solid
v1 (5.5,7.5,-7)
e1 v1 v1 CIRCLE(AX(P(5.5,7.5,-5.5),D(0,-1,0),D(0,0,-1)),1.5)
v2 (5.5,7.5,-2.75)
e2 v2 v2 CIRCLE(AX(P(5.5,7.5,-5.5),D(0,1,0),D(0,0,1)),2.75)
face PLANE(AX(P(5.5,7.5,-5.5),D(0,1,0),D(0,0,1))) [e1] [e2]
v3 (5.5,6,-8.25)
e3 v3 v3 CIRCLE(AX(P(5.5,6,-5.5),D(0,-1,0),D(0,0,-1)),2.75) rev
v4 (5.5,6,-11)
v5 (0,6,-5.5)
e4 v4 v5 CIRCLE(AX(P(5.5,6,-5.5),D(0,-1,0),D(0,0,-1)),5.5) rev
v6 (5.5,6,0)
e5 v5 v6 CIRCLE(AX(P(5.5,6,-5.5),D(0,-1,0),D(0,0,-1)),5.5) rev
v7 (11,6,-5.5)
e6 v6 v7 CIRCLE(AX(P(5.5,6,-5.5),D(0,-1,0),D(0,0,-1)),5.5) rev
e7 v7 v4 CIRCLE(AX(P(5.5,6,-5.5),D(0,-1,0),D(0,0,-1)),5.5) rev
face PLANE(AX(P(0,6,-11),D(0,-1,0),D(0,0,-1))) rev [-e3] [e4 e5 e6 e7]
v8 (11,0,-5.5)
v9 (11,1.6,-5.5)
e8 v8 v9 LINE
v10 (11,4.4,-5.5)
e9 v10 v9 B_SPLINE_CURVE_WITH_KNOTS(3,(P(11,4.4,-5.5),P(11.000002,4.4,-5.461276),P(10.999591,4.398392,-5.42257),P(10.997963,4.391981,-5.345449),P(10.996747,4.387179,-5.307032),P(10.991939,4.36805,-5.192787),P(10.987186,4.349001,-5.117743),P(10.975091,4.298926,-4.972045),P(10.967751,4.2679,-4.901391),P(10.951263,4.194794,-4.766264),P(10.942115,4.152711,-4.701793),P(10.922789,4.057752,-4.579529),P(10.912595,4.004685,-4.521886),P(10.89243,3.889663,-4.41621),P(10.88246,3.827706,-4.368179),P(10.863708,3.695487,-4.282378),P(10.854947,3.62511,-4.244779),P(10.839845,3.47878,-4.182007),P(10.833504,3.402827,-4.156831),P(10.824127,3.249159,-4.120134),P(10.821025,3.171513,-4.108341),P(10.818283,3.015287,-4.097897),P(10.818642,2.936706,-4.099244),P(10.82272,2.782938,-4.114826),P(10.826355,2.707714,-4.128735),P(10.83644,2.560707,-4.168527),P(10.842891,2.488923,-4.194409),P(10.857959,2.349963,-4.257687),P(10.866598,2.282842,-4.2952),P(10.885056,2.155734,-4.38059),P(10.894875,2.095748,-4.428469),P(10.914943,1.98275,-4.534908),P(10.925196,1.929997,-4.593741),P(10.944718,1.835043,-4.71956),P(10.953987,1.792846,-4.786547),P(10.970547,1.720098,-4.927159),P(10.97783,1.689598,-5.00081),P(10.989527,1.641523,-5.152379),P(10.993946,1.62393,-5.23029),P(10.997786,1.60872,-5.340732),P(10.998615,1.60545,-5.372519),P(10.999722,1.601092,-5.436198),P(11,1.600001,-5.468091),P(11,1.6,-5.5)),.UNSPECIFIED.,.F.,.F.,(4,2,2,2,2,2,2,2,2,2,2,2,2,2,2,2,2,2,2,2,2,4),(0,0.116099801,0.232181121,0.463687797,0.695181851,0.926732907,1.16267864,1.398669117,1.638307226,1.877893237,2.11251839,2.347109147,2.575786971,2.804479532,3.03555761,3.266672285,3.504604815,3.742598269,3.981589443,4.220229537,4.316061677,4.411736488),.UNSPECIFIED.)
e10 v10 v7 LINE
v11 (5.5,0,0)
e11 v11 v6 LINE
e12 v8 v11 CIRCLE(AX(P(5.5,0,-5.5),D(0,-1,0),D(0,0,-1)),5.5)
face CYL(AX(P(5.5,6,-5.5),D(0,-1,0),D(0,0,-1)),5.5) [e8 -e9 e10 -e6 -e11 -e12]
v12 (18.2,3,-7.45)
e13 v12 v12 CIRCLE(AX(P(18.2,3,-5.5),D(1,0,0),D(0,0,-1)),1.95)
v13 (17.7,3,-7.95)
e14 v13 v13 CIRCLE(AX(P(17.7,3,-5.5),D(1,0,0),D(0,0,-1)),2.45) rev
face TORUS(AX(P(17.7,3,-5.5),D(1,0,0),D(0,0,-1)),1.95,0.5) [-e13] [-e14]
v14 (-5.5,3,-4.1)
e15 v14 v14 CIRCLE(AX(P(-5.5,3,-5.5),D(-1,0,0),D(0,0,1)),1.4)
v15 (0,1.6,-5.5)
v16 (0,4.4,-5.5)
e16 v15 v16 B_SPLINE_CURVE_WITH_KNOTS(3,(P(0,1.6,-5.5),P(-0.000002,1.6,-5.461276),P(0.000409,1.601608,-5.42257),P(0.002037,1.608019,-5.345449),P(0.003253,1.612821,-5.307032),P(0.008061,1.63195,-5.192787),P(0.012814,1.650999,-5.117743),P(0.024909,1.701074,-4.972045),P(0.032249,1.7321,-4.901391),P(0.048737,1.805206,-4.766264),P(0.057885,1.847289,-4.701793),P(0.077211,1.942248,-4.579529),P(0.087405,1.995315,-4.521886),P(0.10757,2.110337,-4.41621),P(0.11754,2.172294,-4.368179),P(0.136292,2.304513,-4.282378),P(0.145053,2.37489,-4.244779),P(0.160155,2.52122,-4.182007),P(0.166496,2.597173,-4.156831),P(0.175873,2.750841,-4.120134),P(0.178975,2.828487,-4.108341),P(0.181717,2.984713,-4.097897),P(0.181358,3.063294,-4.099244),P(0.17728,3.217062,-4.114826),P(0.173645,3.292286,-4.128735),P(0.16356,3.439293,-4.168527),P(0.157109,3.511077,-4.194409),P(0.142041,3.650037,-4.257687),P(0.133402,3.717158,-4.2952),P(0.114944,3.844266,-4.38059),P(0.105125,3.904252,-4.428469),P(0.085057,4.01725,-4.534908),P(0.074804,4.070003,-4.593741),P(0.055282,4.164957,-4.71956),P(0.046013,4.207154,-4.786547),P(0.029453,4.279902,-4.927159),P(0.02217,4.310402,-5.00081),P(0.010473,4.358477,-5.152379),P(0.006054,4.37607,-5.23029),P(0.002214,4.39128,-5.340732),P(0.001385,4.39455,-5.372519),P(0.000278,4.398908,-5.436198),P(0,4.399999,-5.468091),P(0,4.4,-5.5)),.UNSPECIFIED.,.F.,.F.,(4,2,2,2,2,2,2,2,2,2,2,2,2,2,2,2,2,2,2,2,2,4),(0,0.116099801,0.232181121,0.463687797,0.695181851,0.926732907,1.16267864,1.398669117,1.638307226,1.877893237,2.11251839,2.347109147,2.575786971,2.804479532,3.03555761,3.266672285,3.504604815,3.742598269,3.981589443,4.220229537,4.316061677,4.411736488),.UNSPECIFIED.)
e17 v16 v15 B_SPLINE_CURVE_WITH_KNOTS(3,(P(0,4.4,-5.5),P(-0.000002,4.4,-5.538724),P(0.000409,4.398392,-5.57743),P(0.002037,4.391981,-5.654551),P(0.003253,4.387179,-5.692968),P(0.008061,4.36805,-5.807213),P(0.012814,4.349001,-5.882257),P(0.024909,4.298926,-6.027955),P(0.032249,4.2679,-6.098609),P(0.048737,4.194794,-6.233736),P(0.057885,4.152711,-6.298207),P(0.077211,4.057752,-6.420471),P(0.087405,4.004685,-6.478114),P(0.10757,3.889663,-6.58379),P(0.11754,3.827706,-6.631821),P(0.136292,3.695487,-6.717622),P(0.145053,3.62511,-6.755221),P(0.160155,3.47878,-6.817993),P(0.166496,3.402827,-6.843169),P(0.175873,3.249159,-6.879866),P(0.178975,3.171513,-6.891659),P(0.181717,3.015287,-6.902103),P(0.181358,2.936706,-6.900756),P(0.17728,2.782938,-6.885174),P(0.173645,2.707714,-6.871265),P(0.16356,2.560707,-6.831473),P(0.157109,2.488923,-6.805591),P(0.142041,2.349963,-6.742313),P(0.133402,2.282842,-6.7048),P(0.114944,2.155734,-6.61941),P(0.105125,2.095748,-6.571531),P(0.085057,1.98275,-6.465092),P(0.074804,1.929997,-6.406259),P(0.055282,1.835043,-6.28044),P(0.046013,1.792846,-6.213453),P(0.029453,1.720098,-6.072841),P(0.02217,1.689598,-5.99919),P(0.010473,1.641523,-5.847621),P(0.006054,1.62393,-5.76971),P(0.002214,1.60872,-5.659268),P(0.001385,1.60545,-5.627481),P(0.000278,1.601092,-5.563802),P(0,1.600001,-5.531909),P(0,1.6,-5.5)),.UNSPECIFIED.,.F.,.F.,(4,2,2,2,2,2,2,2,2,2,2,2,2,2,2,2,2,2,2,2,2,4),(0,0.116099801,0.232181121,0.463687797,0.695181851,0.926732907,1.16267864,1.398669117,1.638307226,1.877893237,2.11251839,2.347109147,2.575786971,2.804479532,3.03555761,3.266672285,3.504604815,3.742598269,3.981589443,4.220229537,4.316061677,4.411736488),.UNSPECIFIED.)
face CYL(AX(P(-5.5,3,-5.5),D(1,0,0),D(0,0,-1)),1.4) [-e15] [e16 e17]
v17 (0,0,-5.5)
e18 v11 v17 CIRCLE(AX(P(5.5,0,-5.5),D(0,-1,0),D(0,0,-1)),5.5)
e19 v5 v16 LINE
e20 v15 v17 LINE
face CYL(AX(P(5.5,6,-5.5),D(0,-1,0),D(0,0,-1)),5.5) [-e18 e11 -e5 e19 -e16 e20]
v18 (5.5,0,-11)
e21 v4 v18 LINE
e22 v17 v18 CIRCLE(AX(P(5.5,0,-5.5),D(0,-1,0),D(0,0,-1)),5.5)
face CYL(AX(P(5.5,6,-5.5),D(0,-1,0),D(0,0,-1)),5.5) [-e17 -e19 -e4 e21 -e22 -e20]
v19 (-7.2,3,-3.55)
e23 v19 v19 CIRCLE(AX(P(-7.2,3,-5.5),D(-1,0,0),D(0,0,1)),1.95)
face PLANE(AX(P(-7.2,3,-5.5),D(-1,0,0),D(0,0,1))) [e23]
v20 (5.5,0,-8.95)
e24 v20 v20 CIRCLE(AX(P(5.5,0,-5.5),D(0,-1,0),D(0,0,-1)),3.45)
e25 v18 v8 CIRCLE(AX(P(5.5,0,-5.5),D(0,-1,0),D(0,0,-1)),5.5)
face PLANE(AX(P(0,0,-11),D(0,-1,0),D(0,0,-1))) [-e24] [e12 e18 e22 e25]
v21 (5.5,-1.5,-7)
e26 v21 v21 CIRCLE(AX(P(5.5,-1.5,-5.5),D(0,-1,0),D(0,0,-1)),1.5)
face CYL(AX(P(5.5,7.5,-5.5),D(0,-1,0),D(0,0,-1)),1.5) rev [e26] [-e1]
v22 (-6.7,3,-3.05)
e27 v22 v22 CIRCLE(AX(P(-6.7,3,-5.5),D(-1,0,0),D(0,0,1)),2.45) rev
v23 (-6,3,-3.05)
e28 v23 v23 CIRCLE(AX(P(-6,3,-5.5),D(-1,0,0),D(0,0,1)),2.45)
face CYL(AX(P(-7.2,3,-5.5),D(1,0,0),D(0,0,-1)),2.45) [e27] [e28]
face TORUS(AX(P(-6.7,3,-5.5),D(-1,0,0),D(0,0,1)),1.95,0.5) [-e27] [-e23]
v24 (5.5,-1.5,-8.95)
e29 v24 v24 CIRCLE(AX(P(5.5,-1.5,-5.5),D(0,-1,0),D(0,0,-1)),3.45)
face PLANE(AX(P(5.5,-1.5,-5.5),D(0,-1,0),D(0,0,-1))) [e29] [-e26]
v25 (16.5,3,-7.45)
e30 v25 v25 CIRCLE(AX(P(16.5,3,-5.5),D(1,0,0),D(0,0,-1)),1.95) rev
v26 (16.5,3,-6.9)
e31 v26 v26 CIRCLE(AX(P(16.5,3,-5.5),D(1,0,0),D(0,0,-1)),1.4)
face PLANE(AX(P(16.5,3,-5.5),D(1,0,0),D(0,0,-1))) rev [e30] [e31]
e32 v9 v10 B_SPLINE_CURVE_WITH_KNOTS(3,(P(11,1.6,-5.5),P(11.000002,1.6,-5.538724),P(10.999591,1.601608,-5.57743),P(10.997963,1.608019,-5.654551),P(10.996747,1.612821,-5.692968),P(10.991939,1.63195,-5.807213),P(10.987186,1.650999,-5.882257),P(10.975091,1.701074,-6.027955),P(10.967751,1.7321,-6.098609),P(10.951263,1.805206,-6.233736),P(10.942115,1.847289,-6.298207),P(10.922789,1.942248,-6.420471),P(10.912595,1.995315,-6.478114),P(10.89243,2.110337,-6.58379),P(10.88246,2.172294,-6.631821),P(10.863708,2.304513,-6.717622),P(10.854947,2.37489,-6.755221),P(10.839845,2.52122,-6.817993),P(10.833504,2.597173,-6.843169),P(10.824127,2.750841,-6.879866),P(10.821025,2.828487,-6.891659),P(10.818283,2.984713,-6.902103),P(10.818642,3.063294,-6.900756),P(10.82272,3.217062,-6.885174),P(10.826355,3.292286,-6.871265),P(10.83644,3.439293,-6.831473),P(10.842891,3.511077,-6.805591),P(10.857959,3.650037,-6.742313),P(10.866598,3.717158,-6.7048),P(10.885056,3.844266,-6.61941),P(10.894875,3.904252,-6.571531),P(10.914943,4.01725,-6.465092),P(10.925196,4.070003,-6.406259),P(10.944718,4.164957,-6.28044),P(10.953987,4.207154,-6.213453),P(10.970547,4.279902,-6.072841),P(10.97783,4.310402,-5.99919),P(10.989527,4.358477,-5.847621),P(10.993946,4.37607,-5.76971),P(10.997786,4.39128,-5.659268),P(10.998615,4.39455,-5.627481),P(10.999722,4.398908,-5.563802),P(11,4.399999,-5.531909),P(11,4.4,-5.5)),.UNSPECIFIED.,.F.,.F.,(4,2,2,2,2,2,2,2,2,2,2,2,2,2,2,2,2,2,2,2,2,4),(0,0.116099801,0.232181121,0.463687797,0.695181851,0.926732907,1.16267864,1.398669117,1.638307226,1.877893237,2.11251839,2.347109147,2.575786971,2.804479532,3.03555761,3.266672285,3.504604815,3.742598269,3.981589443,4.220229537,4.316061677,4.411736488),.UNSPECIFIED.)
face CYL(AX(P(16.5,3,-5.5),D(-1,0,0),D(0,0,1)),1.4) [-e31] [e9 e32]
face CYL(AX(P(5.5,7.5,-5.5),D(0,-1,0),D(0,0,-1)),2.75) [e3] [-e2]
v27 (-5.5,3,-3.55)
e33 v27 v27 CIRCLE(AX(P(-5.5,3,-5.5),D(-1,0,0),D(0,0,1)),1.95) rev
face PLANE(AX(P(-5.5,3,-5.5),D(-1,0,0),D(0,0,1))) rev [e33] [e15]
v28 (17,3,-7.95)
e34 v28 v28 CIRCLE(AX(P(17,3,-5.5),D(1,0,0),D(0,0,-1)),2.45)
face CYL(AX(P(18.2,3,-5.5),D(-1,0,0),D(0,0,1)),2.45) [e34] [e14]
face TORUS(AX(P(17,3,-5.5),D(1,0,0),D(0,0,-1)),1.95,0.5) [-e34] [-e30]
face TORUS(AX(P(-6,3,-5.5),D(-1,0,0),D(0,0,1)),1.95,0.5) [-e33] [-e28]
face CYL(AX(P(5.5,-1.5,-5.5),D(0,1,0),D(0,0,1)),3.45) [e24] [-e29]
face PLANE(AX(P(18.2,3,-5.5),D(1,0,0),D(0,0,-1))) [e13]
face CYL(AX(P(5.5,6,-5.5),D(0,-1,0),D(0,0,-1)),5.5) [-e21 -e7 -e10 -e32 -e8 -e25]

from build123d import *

# Parameters (mm, degrees)
SKETCH1_W      = 11
SKETCH1_H      = 11
EXTRUDE1_DEPTH = 6
SKETCH2_R      = 1.4
EXTRUDE2_DEPTH = 5.5
EXTRUDE3_START = 5.5
SKETCH3_R      = 1.4
EXTRUDE3_DEPTH = 5.5
SKETCH4_R      = 2.75
EXTRUDE4_DEPTH = 1.5
SKETCH5_R      = 3.45
EXTRUDE5_DEPTH = 1.5
SKETCH6_R      = 2.45
EXTRUDE6_DEPTH = 1.7
EXTRUDE7_START = 1.7
SKETCH7_R      = 2.45
EXTRUDE7_DEPTH = 1.7
SKETCH8_R      = 1.5
EXTRUDE8_DEPTH = 24.091989953
FILLET1_R      = 5.5
FILLET3_R      = 0.5


with BuildPart() as part:
    # Sketch1 → Extrude1 (new body)
    with BuildSketch(Plane(origin=(0, 0, 0), x_dir=(1, 0, 0), z_dir=(0, 1, 0))):
        with Locations((5.5, 5.5)):
            Rectangle(SKETCH1_W, SKETCH1_H)
    extrude(amount=EXTRUDE1_DEPTH)

    # Sketch2 → Extrude2 (add)
    with BuildSketch(Plane(origin=(11, 0, 0), x_dir=(0, 0, -1), z_dir=(1, 0, 0))):
        with Locations(Location((5.5, 3, 0), (0, 0, 180))):
            Circle(SKETCH2_R)
    extrude(amount=EXTRUDE2_DEPTH)

    # Sketch3 → Extrude3 (add)
    with BuildSketch(Plane.ZY.offset(EXTRUDE3_START)):
        with Locations((-5.5, 3)):
            Circle(SKETCH3_R)
    extrude(amount=-EXTRUDE3_DEPTH)

    # Sketch4 → Extrude4 (add)
    with BuildSketch(Plane(origin=(0, 6, 0), x_dir=(1, 0, 0), z_dir=(0, 1, 0))):
        with Locations(Location((5.5, 5.5, 0), (0, 0, 90))):
            Circle(SKETCH4_R)
    extrude(amount=EXTRUDE4_DEPTH)

    # Sketch5 → Extrude5 (add)
    with BuildSketch(Plane.XZ):
        with Locations(Location((5.5, -5.5, 0), (0, 0, 270))):
            Circle(SKETCH5_R)
    extrude(amount=EXTRUDE5_DEPTH)

    # Sketch6 → Extrude6 (add)
    with BuildSketch(Plane(origin=(16.5, 0, 0), x_dir=(0, 0, -1), z_dir=(1, 0, 0))):
        with Locations((5.5, 3)):
            Circle(SKETCH6_R)
    extrude(amount=EXTRUDE6_DEPTH)

    # Sketch7 → Extrude7 (add)
    with BuildSketch(Plane.ZY.offset(5.5).offset(EXTRUDE7_START)):
        with Locations(Location((-5.5, 3, 0), (0, 0, 180))):
            Circle(SKETCH7_R)
    extrude(amount=-EXTRUDE7_DEPTH)

    # Sketch8 → Extrude8 (cut, through all)
    with BuildSketch(Plane.XZ.offset(1.5)):
        with Locations(Location((5.5, -5.5, 0), (0, 0, 270))):
            Circle(SKETCH8_R)
    extrude(amount=-EXTRUDE8_DEPTH, mode=Mode.SUBTRACT)

    # Fillet1
    # the kernel refuses this fillet: 5.5 mm, written as the material it takes off along each edge
    with BuildSketch(Plane(origin=(0, -13.75, 0), x_dir=(0, 0, -1), z_dir=(0, 1, 0))) as fillet1_piece_1_section:
        with BuildLine():
            CenterArc((FILLET1_R, -FILLET1_R), FILLET1_R, 90, 90)
            Line((0, -FILLET1_R), (0, 0))
            Line((0, 0), (FILLET1_R, 0))
        make_face()
    fillet1_piece_1 = extrude(amount=33.5, mode=Mode.PRIVATE)
    fillet1_piece_1 = fillet1_piece_1 - Plane(origin=(1.247523626, 3, -5.5), x_dir=(0, 0, 1), z_dir=(-1, 0, 0)) * Cylinder(1.4, 89, mode=Mode.PRIVATE)
    with BuildSketch(Plane(origin=(0, -13.75, -11), x_dir=(0, 0, 1), z_dir=(0, 1, 0))) as fillet1_piece_2_section:
        with BuildLine():
            CenterArc((FILLET1_R, FILLET1_R), FILLET1_R, 180, 90)
            Line((0, FILLET1_R), (0, 0))
            Line((0, 0), (FILLET1_R, 0))
        make_face()
    fillet1_piece_2 = extrude(amount=33.5, mode=Mode.PRIVATE)
    fillet1_piece_2 = fillet1_piece_2 - Plane(origin=(1.247523509, 3, -5.5), x_dir=(0, 0, 1), z_dir=(-1, 0, 0)) * Cylinder(1.4, 89, mode=Mode.PRIVATE)
    with BuildSketch(Plane(origin=(11, -13.75, -11), x_dir=(-1, 0, 0), z_dir=(0, 1, 0))) as fillet1_piece_3_section:
        with BuildLine():
            CenterArc((FILLET1_R, FILLET1_R), FILLET1_R, 180, 90)
            Line((0, FILLET1_R), (0, 0))
            Line((0, 0), (FILLET1_R, 0))
        make_face()
    fillet1_piece_3 = extrude(amount=33.5, mode=Mode.PRIVATE)
    fillet1_piece_3 = fillet1_piece_3 - Plane(origin=(9.752477266, 3, -5.5), x_dir=(0, 0, 1), z_dir=(-1, 0, 0)) * Cylinder(1.4, 89, mode=Mode.PRIVATE)
    with BuildSketch(Plane(origin=(11, -13.75, 0), x_dir=(-1, 0, 0), z_dir=(0, 1, 0))) as fillet1_piece_4_section:
        with BuildLine():
            CenterArc((FILLET1_R, -FILLET1_R), FILLET1_R, 90, 90)
            Line((0, -FILLET1_R), (0, 0))
            Line((0, 0), (FILLET1_R, 0))
        make_face()
    fillet1_piece_4 = extrude(amount=33.5, mode=Mode.PRIVATE)
    fillet1_piece_4 = fillet1_piece_4 - Plane(origin=(9.752475868, 3, -5.5), x_dir=(0, 0, 1), z_dir=(-1, 0, 0)) * Cylinder(1.4, 89, mode=Mode.PRIVATE)
    add([fillet1_piece_1, fillet1_piece_2, fillet1_piece_3, fillet1_piece_4], mode=Mode.SUBTRACT)

    # Fillet3
    fillet3_edges = [part.edges().sort_by_distance(p)[0] for p in [
        (16.5, 3, -3.05),
        (18.2, 3, -3.05),
        (-5.5, 3, -3.05),
        (-7.2, 3, -3.05),
    ]]
    fillet(fillet3_edges, radius=FILLET3_R)


solid = part.part
